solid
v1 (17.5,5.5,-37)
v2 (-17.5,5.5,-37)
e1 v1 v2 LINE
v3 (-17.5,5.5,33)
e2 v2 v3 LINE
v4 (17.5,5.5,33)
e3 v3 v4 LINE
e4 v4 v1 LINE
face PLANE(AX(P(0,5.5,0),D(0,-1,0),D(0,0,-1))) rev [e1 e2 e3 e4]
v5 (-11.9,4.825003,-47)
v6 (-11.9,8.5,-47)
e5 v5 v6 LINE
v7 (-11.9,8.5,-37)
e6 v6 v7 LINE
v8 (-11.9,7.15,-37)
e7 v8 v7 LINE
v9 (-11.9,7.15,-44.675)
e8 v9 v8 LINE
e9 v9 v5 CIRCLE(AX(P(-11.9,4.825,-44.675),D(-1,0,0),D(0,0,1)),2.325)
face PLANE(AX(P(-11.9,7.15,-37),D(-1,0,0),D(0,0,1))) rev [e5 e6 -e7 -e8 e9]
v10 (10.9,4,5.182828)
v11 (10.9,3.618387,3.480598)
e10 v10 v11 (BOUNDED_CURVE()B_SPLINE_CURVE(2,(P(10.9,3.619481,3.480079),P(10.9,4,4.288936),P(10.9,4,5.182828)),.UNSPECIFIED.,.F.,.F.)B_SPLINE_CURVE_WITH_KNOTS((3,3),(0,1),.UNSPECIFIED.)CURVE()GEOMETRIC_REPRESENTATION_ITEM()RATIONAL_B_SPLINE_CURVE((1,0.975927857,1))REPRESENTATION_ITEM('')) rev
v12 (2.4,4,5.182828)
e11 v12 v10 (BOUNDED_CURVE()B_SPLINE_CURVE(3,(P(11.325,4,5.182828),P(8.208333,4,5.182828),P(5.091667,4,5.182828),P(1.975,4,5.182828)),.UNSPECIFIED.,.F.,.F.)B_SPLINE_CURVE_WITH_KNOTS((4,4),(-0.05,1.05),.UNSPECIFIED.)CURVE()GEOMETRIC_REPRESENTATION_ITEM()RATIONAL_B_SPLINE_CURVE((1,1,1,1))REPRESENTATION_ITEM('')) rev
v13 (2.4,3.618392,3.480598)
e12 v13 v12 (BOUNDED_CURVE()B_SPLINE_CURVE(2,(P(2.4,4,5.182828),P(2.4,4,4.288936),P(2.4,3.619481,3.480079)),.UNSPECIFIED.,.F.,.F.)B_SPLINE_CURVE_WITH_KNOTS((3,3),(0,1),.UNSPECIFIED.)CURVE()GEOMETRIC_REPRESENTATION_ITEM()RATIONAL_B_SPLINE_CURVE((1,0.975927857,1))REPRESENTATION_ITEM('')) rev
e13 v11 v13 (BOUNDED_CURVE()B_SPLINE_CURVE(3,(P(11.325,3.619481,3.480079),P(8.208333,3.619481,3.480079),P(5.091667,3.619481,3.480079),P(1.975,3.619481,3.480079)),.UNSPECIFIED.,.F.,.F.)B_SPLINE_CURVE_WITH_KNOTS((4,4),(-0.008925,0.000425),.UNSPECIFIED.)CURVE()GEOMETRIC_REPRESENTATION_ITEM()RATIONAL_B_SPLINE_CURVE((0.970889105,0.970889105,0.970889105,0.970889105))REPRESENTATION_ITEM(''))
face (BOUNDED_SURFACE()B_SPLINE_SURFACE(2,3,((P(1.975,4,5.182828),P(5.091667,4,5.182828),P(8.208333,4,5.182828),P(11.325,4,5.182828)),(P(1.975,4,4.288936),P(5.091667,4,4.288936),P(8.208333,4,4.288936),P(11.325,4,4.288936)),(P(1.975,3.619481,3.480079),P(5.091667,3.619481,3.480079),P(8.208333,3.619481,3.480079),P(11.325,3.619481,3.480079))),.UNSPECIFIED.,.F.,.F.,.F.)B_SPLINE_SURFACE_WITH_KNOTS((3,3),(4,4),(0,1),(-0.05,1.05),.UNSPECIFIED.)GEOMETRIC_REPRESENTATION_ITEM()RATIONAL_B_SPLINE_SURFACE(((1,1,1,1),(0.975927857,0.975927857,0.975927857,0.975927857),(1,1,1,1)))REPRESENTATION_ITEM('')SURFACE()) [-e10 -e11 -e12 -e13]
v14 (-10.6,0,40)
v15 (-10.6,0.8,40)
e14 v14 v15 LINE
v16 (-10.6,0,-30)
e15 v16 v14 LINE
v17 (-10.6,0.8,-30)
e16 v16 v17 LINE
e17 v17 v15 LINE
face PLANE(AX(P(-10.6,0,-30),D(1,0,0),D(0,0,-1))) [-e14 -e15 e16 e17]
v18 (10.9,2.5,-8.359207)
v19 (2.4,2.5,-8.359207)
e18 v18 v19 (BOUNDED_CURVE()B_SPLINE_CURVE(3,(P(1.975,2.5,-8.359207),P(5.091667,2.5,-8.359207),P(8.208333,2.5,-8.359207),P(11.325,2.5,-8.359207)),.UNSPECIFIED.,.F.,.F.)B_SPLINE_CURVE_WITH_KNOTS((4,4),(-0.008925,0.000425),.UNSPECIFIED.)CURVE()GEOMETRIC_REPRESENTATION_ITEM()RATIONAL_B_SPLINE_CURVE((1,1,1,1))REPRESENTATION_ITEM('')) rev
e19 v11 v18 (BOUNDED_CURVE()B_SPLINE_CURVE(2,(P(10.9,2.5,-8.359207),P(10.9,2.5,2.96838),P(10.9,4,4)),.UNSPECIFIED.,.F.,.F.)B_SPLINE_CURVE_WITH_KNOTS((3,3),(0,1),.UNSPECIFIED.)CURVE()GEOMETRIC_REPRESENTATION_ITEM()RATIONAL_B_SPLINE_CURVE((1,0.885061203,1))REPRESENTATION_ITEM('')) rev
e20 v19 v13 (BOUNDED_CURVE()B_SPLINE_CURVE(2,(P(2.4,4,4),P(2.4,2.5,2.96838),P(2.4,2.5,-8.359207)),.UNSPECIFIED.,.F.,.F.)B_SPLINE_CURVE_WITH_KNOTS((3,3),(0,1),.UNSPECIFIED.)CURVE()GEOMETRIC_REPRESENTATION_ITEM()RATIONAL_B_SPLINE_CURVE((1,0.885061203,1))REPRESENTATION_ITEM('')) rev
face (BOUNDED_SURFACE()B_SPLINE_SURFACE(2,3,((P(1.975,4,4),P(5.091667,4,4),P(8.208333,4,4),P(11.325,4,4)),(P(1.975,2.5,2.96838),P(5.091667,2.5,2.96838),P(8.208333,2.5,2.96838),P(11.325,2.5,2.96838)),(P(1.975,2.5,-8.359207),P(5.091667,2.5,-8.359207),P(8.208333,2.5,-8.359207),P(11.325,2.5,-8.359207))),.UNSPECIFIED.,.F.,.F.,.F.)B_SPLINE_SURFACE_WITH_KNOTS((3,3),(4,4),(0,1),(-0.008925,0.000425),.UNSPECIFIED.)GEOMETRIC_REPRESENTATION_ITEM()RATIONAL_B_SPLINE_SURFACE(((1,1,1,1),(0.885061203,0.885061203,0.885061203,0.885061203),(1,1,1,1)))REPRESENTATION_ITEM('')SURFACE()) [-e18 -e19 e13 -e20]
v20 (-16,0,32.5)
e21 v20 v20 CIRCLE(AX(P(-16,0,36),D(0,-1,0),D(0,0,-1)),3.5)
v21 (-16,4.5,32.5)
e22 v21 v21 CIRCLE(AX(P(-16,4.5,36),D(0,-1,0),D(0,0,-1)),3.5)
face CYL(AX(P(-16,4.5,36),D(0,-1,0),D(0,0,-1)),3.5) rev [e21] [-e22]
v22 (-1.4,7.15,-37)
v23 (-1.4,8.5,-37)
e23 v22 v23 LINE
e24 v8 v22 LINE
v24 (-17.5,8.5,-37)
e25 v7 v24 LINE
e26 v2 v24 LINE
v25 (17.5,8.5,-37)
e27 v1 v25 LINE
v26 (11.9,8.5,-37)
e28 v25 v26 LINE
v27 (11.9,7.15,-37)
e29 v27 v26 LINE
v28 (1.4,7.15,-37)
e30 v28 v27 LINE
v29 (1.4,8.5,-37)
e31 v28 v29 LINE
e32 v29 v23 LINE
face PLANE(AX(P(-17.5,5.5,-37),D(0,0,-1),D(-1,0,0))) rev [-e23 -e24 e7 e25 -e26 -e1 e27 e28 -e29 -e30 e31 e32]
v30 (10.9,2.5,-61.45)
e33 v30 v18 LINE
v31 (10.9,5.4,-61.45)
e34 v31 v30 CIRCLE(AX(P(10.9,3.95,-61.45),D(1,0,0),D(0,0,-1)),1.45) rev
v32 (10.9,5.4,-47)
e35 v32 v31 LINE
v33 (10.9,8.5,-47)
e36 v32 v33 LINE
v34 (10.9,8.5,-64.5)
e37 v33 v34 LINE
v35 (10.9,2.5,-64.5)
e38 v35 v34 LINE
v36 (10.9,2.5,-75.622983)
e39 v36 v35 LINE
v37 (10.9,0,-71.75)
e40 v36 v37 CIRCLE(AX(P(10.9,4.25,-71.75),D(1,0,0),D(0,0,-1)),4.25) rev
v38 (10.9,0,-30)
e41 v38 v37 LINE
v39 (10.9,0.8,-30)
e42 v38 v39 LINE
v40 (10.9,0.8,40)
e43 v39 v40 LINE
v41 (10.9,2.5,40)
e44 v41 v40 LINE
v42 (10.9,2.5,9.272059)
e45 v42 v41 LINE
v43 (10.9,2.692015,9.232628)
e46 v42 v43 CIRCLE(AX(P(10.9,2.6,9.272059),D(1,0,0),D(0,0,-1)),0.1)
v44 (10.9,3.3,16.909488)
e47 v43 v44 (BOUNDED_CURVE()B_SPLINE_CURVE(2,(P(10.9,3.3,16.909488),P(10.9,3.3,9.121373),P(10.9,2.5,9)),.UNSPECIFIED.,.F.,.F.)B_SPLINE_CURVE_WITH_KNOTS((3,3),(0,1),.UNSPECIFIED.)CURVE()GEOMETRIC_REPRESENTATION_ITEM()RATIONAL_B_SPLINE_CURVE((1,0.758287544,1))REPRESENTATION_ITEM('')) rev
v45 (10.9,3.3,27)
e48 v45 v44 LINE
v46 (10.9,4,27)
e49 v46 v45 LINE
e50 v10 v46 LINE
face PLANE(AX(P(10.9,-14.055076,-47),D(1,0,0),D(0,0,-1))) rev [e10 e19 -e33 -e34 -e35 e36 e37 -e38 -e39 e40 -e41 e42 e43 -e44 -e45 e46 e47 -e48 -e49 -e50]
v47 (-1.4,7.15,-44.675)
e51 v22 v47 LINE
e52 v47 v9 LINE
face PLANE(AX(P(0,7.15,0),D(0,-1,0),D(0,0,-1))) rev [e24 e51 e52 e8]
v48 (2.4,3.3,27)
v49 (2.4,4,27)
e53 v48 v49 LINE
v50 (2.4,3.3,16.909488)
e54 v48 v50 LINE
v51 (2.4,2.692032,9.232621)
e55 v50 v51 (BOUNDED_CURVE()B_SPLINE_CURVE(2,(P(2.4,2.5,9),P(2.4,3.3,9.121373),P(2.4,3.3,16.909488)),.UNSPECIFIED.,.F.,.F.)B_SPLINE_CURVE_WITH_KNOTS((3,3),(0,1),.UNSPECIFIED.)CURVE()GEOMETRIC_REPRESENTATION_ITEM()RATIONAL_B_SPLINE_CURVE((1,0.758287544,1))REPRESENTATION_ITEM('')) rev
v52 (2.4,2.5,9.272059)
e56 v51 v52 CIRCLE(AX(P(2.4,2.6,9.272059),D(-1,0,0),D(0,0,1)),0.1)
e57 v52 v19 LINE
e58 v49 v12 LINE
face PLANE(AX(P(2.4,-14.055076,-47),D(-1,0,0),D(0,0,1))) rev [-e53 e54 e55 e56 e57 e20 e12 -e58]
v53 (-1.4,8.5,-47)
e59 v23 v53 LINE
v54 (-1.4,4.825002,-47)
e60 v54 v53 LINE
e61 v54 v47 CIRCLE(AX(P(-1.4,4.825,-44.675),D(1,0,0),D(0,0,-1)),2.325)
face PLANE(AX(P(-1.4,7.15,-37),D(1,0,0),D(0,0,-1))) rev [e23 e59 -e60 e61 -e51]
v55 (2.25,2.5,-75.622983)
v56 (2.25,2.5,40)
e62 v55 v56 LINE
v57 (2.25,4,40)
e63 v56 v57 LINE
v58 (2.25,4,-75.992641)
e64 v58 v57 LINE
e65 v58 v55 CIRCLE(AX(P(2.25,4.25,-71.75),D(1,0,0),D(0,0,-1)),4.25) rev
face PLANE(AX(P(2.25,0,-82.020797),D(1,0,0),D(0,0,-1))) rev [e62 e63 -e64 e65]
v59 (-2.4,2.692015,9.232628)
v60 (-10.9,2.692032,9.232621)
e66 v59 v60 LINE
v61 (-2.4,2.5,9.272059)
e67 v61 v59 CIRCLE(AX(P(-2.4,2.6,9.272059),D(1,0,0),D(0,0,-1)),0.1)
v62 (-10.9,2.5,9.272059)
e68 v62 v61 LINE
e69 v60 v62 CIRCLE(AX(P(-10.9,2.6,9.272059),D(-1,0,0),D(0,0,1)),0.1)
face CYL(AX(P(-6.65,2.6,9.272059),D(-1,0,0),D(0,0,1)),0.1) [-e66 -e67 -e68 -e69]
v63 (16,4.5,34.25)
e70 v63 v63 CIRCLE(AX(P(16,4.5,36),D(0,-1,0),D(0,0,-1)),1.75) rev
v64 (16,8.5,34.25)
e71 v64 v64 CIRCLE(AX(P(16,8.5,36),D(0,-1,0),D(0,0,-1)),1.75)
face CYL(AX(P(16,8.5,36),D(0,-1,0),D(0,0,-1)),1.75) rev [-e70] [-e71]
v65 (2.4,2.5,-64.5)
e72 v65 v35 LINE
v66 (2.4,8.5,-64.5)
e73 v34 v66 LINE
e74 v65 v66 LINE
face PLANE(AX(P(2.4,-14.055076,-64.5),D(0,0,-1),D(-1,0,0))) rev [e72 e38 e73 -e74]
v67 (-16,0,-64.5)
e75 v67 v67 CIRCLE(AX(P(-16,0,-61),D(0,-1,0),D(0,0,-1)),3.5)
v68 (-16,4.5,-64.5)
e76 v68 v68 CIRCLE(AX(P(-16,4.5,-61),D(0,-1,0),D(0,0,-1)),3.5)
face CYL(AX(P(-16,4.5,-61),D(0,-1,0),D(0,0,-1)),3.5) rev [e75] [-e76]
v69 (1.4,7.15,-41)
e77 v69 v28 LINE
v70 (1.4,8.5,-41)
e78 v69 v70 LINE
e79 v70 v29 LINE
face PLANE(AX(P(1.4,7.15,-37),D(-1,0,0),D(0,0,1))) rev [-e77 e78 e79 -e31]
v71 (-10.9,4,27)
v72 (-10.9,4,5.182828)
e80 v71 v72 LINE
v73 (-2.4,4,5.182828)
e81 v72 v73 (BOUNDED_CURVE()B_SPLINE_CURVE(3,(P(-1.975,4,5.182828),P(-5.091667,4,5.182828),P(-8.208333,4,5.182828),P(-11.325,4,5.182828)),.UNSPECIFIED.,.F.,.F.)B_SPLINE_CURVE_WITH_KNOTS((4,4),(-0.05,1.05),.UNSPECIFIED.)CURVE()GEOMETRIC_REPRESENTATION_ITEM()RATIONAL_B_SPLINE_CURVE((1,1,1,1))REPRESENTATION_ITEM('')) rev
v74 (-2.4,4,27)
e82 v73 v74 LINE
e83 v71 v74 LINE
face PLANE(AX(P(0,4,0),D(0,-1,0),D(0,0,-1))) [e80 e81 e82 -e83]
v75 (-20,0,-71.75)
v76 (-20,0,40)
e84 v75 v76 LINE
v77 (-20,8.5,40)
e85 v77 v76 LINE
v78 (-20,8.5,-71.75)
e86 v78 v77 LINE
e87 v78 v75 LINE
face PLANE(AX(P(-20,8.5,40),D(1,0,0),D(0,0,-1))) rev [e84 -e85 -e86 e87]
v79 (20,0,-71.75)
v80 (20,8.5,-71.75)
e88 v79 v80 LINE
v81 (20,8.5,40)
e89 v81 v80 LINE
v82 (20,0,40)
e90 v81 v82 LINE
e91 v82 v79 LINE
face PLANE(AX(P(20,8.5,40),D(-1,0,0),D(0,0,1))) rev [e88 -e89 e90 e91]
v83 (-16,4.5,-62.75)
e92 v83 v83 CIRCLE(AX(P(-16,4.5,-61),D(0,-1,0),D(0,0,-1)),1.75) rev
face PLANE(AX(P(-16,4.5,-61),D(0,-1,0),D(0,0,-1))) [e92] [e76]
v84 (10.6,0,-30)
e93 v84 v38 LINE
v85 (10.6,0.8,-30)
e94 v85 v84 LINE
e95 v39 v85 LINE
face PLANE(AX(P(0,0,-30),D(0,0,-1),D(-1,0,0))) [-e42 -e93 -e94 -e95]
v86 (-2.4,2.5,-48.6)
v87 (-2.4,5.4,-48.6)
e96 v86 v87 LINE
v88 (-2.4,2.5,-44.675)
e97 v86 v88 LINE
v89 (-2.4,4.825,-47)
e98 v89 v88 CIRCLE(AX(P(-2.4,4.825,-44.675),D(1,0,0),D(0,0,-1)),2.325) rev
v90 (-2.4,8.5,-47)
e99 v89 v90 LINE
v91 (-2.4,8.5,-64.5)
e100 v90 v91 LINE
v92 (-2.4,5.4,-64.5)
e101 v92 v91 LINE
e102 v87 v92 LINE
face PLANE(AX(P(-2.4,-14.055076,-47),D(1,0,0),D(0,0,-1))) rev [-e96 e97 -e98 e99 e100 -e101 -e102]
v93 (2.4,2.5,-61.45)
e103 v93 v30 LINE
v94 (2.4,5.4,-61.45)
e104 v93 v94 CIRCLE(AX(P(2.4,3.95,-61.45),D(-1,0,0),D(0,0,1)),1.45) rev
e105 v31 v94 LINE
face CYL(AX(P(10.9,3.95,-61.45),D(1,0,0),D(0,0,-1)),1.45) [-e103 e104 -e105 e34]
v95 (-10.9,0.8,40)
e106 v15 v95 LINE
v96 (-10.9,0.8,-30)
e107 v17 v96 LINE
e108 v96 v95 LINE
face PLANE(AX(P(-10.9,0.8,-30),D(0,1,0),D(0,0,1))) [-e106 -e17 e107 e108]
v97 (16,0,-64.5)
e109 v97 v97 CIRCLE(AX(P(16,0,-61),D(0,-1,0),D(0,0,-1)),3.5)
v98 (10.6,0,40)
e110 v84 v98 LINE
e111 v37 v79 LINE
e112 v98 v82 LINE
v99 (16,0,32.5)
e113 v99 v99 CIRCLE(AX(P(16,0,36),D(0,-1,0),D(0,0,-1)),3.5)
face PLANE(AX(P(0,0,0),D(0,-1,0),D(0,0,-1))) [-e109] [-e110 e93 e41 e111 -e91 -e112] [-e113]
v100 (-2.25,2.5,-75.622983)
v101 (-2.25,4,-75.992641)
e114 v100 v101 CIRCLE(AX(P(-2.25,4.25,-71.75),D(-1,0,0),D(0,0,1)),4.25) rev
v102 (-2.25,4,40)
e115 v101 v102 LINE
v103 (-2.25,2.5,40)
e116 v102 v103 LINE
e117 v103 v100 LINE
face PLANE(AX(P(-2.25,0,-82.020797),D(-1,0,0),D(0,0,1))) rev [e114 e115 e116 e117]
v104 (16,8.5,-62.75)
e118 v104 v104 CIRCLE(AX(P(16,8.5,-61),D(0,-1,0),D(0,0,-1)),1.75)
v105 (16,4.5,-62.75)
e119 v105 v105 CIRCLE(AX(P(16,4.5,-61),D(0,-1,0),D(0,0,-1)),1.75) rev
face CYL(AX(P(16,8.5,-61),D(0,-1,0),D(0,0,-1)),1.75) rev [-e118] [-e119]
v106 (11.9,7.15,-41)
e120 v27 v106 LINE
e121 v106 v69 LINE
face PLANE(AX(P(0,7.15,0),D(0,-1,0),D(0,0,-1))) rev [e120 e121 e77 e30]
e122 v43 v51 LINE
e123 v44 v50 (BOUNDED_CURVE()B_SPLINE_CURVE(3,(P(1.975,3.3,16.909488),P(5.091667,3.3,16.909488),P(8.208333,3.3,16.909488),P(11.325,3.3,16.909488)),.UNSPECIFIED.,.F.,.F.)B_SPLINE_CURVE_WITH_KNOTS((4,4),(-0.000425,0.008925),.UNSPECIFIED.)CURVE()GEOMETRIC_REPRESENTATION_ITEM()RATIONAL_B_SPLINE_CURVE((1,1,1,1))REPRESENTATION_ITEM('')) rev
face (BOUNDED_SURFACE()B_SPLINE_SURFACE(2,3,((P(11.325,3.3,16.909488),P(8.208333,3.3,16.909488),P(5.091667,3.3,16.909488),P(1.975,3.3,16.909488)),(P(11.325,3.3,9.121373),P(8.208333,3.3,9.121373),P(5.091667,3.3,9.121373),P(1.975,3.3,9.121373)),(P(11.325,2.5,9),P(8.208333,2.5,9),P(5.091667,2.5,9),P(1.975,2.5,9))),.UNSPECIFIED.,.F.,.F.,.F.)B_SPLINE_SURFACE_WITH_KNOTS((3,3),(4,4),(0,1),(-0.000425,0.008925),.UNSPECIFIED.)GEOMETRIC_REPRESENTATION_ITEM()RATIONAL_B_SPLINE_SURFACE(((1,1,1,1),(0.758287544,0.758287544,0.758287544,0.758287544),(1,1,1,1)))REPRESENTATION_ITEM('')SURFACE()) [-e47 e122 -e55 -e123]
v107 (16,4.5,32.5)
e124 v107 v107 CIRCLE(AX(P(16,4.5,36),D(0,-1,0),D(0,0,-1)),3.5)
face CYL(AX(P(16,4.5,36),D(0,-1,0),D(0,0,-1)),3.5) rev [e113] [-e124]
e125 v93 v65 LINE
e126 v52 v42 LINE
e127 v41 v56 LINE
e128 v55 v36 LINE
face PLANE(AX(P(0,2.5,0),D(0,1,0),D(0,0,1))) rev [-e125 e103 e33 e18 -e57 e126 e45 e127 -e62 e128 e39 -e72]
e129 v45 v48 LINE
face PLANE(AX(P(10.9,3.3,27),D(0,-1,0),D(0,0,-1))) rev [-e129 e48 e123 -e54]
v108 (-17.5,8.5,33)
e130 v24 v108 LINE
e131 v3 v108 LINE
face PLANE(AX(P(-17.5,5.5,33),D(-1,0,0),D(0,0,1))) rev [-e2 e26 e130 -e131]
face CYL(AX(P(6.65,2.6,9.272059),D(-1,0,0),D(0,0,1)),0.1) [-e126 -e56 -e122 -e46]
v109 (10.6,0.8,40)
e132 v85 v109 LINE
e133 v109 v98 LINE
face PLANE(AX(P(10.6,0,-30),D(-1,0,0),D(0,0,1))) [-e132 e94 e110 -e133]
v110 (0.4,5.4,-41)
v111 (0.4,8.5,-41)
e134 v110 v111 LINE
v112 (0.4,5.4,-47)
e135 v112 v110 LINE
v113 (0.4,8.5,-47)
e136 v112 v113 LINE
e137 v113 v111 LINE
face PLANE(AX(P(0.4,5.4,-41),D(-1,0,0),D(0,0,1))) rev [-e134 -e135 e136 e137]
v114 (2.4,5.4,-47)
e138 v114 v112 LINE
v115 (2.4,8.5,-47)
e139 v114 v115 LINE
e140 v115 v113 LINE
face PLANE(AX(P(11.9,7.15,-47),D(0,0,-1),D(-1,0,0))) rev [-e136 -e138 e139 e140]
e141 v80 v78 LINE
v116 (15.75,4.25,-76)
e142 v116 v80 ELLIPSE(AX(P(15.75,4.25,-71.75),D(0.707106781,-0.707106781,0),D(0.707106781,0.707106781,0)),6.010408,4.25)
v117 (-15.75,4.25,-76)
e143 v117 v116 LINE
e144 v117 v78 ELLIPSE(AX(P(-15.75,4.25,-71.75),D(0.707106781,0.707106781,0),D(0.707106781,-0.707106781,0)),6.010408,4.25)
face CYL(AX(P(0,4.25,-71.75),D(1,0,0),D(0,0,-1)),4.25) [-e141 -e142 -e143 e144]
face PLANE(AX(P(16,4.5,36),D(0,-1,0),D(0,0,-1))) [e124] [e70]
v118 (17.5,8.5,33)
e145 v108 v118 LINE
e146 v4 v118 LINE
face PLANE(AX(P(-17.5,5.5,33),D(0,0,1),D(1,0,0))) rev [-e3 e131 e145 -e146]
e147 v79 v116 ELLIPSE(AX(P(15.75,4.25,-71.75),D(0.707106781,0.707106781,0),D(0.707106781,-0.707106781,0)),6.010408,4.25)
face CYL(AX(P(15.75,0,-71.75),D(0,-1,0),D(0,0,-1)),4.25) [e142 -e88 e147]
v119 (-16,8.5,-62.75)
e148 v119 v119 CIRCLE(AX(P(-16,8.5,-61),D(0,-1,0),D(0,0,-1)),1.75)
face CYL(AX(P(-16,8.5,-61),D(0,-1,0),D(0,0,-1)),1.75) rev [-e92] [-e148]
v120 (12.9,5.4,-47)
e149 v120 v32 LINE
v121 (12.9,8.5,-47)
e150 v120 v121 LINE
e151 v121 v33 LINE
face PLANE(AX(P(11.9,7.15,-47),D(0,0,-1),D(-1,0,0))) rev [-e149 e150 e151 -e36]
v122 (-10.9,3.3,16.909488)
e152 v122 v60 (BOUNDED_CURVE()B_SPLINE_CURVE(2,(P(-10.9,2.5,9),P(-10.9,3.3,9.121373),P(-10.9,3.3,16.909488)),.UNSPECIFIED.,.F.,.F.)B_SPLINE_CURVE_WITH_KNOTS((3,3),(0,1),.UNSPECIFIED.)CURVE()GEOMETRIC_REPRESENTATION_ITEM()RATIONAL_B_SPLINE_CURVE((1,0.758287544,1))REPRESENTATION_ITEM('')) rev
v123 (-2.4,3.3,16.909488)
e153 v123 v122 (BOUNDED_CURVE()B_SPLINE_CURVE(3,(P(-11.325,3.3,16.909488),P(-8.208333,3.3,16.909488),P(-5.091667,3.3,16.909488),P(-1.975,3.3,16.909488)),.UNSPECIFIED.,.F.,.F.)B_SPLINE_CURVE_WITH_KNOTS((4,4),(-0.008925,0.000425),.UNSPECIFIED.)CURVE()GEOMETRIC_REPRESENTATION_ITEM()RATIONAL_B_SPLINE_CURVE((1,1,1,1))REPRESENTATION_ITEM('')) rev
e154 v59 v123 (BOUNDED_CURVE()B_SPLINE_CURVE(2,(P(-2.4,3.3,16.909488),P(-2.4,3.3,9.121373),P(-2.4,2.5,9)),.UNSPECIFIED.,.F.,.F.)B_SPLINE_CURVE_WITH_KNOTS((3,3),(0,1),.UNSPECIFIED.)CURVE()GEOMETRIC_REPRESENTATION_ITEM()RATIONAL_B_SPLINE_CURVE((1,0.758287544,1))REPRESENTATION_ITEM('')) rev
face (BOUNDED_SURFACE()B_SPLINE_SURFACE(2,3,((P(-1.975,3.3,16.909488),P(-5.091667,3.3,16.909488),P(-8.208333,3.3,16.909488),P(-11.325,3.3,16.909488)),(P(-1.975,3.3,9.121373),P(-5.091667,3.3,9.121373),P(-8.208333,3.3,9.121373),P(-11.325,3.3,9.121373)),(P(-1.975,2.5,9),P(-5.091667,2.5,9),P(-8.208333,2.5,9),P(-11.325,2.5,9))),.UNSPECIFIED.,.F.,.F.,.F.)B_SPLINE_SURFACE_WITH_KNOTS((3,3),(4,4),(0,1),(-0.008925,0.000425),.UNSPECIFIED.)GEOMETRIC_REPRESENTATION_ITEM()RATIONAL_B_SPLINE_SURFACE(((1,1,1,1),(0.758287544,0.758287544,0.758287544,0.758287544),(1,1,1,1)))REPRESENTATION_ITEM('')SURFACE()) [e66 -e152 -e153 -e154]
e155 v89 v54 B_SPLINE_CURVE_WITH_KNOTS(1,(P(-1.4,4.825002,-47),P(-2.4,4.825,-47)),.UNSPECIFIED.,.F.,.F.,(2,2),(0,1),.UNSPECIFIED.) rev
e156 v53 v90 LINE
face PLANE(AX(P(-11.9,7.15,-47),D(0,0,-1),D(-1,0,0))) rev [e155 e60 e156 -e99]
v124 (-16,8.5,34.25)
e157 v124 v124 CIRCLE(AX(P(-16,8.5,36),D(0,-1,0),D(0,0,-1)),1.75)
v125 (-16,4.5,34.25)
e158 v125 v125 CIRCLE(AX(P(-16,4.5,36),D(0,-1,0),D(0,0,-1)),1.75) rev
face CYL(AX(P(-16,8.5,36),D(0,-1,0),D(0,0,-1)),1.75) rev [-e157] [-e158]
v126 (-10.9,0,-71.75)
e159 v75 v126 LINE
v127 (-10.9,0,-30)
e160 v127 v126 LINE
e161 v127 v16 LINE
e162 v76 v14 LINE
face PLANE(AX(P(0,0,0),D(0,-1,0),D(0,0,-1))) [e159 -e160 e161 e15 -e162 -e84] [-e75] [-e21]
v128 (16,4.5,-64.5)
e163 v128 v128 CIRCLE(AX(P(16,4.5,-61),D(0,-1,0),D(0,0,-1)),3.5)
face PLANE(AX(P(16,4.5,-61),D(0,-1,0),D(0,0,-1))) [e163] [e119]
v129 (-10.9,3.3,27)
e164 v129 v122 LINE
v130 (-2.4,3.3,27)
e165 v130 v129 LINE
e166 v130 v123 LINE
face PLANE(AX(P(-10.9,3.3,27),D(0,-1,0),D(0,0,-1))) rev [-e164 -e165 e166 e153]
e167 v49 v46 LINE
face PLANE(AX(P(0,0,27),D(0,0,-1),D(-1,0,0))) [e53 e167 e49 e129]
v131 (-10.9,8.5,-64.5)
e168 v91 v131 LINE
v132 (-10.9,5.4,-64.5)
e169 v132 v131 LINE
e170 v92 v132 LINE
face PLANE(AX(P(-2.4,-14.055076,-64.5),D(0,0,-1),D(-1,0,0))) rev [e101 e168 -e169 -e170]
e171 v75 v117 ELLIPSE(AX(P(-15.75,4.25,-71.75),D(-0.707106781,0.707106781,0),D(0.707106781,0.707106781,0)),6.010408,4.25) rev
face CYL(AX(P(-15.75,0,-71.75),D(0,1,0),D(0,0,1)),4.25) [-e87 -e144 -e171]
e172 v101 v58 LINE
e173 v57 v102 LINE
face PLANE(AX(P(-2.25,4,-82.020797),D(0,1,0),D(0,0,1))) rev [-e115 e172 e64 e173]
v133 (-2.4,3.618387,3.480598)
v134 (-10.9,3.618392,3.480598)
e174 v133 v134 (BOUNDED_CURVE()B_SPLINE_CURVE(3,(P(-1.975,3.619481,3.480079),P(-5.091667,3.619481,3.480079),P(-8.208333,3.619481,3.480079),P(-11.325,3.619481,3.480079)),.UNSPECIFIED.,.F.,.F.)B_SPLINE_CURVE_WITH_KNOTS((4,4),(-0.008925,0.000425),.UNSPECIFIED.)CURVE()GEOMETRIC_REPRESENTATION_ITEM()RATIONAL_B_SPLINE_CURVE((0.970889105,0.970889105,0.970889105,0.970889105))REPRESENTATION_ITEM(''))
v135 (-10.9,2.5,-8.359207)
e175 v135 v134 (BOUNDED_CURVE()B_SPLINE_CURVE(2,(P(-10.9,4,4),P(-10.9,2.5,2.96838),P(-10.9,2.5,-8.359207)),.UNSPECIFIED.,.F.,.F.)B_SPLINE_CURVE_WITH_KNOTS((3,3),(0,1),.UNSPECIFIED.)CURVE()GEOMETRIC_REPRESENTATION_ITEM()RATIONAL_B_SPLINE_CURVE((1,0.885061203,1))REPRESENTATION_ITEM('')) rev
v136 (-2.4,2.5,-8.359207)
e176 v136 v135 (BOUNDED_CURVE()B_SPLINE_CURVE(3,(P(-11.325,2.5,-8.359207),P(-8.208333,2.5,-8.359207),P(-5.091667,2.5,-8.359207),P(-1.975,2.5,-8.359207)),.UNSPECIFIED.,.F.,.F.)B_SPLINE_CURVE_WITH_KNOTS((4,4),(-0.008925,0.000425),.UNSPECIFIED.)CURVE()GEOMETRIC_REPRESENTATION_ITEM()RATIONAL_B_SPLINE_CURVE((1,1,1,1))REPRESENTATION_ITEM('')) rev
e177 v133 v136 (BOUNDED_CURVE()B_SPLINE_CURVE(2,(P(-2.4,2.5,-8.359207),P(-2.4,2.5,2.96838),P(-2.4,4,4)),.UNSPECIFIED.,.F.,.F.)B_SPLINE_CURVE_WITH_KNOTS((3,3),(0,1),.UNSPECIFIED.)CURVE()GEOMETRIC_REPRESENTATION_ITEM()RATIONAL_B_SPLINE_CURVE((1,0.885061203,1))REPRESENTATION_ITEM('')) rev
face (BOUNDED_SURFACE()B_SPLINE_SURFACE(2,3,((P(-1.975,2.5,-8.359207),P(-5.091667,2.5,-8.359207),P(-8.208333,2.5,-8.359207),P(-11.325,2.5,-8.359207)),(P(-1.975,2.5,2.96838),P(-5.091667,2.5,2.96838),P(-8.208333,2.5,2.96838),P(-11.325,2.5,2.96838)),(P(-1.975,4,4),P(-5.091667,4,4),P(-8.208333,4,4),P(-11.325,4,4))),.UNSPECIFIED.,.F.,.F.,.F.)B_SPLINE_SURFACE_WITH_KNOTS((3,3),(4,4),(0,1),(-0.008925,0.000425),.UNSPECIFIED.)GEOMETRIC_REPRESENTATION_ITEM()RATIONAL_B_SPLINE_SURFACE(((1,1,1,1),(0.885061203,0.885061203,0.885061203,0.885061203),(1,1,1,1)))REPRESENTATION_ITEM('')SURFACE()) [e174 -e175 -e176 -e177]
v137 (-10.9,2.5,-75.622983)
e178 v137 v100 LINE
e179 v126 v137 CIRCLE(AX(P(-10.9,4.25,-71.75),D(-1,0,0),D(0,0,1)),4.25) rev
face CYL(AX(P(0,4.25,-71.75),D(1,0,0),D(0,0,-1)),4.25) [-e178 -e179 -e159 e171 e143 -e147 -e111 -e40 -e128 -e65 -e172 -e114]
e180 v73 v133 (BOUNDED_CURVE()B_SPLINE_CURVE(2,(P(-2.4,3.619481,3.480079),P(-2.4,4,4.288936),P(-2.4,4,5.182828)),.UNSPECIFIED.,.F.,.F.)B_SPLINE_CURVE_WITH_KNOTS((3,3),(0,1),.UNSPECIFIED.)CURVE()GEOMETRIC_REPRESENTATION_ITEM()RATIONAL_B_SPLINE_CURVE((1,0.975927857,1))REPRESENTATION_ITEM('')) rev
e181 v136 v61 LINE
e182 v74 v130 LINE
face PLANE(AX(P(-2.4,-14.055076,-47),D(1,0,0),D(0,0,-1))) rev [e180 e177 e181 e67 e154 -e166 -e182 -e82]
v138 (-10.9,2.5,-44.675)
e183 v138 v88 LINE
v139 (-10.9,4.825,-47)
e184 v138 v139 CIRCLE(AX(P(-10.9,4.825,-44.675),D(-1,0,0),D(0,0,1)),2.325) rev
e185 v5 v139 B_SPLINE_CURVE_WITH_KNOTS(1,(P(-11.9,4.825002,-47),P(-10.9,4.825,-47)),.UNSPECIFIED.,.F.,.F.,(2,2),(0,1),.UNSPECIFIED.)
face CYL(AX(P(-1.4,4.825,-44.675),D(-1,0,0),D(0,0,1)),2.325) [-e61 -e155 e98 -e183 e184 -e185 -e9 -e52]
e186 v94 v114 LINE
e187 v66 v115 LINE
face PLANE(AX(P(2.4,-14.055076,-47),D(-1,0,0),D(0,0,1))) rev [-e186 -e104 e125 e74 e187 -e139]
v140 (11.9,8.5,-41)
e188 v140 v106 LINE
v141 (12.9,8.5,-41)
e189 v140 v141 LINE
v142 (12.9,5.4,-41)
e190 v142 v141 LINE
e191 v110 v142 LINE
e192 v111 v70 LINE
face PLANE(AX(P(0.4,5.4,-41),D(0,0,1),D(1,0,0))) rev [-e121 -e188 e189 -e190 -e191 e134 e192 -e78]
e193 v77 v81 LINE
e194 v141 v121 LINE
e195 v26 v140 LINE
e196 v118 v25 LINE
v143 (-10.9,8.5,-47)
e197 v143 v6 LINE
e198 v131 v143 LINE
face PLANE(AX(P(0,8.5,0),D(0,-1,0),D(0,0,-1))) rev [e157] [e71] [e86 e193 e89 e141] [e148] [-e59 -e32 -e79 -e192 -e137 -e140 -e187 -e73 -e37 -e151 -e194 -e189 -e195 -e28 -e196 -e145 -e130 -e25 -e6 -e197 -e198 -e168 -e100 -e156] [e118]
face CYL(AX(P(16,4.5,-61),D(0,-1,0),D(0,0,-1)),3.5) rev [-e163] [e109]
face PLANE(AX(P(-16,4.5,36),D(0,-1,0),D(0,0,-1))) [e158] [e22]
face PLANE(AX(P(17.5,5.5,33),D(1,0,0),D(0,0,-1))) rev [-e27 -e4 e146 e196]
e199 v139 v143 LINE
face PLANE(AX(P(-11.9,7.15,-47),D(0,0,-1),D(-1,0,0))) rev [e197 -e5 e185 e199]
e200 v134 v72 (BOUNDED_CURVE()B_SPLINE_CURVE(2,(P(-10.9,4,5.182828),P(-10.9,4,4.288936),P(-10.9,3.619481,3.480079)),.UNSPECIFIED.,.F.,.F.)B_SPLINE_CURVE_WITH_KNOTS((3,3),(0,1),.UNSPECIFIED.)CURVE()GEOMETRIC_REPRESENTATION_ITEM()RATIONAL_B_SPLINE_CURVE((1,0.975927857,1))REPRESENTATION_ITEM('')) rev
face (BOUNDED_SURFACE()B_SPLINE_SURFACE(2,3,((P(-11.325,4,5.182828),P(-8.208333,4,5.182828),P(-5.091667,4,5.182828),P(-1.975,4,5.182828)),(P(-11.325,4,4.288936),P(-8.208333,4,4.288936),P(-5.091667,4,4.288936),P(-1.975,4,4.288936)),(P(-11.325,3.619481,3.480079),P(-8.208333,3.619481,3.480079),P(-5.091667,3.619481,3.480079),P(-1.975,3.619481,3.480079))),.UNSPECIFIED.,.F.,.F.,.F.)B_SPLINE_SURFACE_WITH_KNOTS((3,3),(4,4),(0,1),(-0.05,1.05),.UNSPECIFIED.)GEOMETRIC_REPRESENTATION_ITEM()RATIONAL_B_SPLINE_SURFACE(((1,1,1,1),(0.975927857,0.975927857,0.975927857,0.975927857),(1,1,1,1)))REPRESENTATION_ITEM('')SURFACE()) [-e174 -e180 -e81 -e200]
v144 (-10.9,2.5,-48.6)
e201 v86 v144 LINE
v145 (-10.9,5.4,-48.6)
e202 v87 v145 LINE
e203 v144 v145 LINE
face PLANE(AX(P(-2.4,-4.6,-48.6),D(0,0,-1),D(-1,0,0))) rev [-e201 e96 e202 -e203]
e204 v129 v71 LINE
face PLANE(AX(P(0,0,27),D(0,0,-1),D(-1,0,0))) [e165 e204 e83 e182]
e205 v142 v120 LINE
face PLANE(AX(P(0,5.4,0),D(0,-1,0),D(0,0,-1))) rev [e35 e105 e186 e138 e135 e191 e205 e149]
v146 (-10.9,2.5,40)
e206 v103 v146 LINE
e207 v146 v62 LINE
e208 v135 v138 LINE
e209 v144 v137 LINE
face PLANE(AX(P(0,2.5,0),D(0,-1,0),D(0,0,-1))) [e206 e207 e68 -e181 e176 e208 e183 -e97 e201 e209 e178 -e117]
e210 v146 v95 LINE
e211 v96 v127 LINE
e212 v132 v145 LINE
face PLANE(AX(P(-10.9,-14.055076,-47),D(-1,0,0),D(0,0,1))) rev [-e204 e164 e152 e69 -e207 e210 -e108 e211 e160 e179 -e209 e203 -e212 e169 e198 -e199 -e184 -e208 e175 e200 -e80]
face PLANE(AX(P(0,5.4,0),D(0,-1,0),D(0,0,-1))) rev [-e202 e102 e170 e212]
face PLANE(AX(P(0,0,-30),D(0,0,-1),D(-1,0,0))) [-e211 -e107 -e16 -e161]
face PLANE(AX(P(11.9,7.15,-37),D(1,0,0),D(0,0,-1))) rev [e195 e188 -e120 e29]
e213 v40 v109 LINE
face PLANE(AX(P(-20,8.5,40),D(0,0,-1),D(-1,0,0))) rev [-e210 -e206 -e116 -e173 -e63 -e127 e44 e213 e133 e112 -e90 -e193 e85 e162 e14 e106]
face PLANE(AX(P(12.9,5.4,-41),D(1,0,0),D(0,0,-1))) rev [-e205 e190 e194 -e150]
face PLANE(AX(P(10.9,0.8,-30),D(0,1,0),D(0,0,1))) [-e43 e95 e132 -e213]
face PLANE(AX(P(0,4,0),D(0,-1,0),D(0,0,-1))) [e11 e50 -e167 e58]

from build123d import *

# Parameters (mm, degrees)
SKETCH1_W                  = 40
SKETCH1_H                  = 106
BOSS_EXTRUDE1_DEPTH        = 8.5
SKETCH2_W                  = 35
SKETCH2_H                  = 70
CUT_EXTRUDE1_DEPTH         = 3
SKETCH3_W                  = 10.5
SKETCH3_H                  = 10
CUT_EXTRUDE2_DEPTH         = 1.35
SKETCH4_W                  = 12.5
SKETCH4_H                  = 6
CUT_EXTRUDE3_DEPTH         = 3.1
SKETCH5_W                  = 8.5
SKETCH5_H                  = 17.5
PCB_PLACE_DEPTH            = 3.1
SKETCH6_W                  = 8.5
SKETCH6_H                  = 1.6
NICKEL_STRIP_HOLE_DEPTH    = 70.174850921
CUT_EXTRUDE4_REACH         = 71.486
SKETCH7_W                  = 8.5
SKETCH7_H                  = 17.5
SKETCH8_W                  = 8.5
SKETCH8_H                  = 1.6
CUT_EXTRUDE5_DEPTH         = 10
SKETCH9_W                  = 8.5
SKETCH9_H                  = 106
NICKEL_STRIP_RAIL_DEPTH    = 2.5
FILLET3_R                  = 2.325
FILLET4_RADIUS             = 1.45
FILLET4_LENGTH             = 8.5
SKETCH10_W                 = 8.5
SKETCH10_H                 = 5
CUT_EXTRUDE6_DEPTH         = 1.5
SKETCH11_W                 = 8.5
SKETCH11_H                 = 0.7
NICKELSTRIPINSERTION_DEPTH = 18
FILLET5_INSERTION_START    = -10.9
FILLET5_INSERTION_DEPTH    = 8.5
FILLET5_INSERTION_START_2  = 2.4
FILLET5_INSERTION_2_DEPTH  = 8.5
FILLET7_AMEND_R            = 4
FILLET6_START              = -10.9
FILLET6_DEPTH              = 8.5
FILLET6_START_2            = 2.4
FILLET6_2_DEPTH            = 8.5
FILLET8_ROUNDING_R         = 0.1
SKETCH12_W                 = 0.3
SKETCH12_H                 = 0.8
STRIPRAIL_DEPTH            = 70
SKETCH13_R                 = 1.75
SCREW_HOLES_DEPTH          = 70.485610128
SKETCH14_R                 = 3.5
SCREW_HEAD_HOLES_TBM_DEPTH = 4.5
BOSS_EXTRUDE2_DEPTH        = 10
FILLET9_R                  = 4.25
CUT_EXTRUDE7_REACH         = 120.018
SKETCH17_W                 = 4.5
SKETCH17_H                 = 4
CUT_EXTRUDE8_REACH         = 120.018
SKETCH18_W                 = 5.4
SKETCH18_H                 = 2.5


with BuildPart() as part:
    # Sketch1 → Boss-Extrude1 (new body)
    with BuildSketch(Plane(origin=(0, 0, 0), x_dir=(1, 0, 0), z_dir=(0, 1, 0))):
        with Locations((0, 13)):
            Rectangle(SKETCH1_W, SKETCH1_H)
    extrude(amount=BOSS_EXTRUDE1_DEPTH)

    # Sketch2 → Cut-Extrude1 (cut)
    with BuildSketch(Plane(origin=(0, 8.5, 0), x_dir=(1, 0, 0), z_dir=(0, 1, 0))):
        with Locations((0, 2)):
            Rectangle(SKETCH2_W, SKETCH2_H)
    extrude(amount=-CUT_EXTRUDE1_DEPTH, mode=Mode.SUBTRACT)

    # Sketch3 → Cut-Extrude2 (cut)
    with BuildSketch(Plane(origin=(0, 8.5, 0), x_dir=(1, 0, 0), z_dir=(0, 1, 0))):
        with Locations((-6.65, 42)):
            Rectangle(SKETCH3_W, SKETCH3_H)
        with Locations((6.65, 42)):
            Rectangle(SKETCH3_W, SKETCH3_H)
    extrude(amount=-CUT_EXTRUDE2_DEPTH, mode=Mode.SUBTRACT)

    # Sketch4 → Cut-Extrude3 (cut)
    with BuildSketch(Plane(origin=(0, 8.5, 0), x_dir=(1, 0, 0), z_dir=(0, 1, 0))):
        with Locations((6.65, 44)):
            Rectangle(SKETCH4_W, SKETCH4_H)
    extrude(amount=-CUT_EXTRUDE3_DEPTH, mode=Mode.SUBTRACT)

    # Sketch5 → PCB place (cut)
    with BuildSketch(Plane(origin=(0, 8.5, 0), x_dir=(1, 0, 0), z_dir=(0, 1, 0))):
        with Locations((6.65, 55.75)):
            Rectangle(SKETCH5_W, SKETCH5_H)
    extrude(amount=-PCB_PLACE_DEPTH, mode=Mode.SUBTRACT)

    # Sketch6 → Nickel strip hole (cut, through all)
    with BuildSketch(Plane(origin=(0, 5.4, 0), x_dir=(1, 0, 0), z_dir=(0, 1, 0))):
        with Locations((6.65, 63.7)):
            Rectangle(SKETCH6_W, SKETCH6_H)
    extrude(amount=-NICKEL_STRIP_HOLE_DEPTH, mode=Mode.SUBTRACT)

    # Cut-Extrude4: up to this face of the body (flat: up to its plane)
    cut_extrude4_end = Plane(part.part.faces().sort_by_distance((6.65, 5.4, -51.042077088))[0])
    # Sketch7 → Cut-Extrude4 (cut, up to the picked face)
    with BuildSketch(Plane(origin=(0, 8.5, 0), x_dir=(1, 0, 0), z_dir=(0, 1, 0)), mode=Mode.PRIVATE) as cut_extrude4_sk1:
        with Locations((-6.65, 55.75)):
            Rectangle(SKETCH7_W, SKETCH7_H)
    cut_extrude4_tool1 = split(extrude(cut_extrude4_sk1.sketch, amount=-CUT_EXTRUDE4_REACH, mode=Mode.PRIVATE), bisect_by=cut_extrude4_end, keep=Keep.BOTH, mode=Mode.PRIVATE)
    add(cut_extrude4_tool1.solids().sort_by(Axis((-6.65, 8.5, -55.75), (0, -1, 0)))[0], mode=Mode.SUBTRACT)

    # Sketch8 → Cut-Extrude5 (cut)
    with BuildSketch(Plane(origin=(0, 5.4, 0), x_dir=(1, 0, 0), z_dir=(0, 1, 0))):
        with Locations((-6.65, 47.8)):
            Rectangle(SKETCH8_W, SKETCH8_H)
    extrude(amount=-CUT_EXTRUDE5_DEPTH, mode=Mode.SUBTRACT)

    # Sketch9 → Nickel strip rail (cut)
    with BuildSketch(Plane.XZ):
        with Locations((-6.65, -13)):
            Rectangle(SKETCH9_W, SKETCH9_H)
        with Locations((6.65, -13)):
            Rectangle(SKETCH9_W, SKETCH9_H)
    extrude(amount=-NICKEL_STRIP_RAIL_DEPTH, mode=Mode.SUBTRACT)

    # Fillet3
    # the kernel refuses this fillet: 2.325 mm, written as the material it takes off along each edge
    with BuildSketch(Plane(origin=(3.4125, 7.15, -47), x_dir=(0, 0, 1), z_dir=(-1, 0, 0))) as fillet3_piece_1_section:
        with BuildLine():
            CenterArc((FILLET3_R, -FILLET3_R), FILLET3_R, 90, 90)
            Line((0, -FILLET3_R), (0, 0))
            Line((0, 0), (FILLET3_R, 0))
        make_face()
    fillet3_piece_1 = extrude(amount=20.125, mode=Mode.PRIVATE)
    fillet3_piece_1 = split(fillet3_piece_1, bisect_by=Plane(origin=(-11.9, 7.15, -47), z_dir=(1, 0, 0)), keep=Keep.TOP, mode=Mode.PRIVATE)
    fillet3_piece_1 = split(fillet3_piece_1, bisect_by=Plane(origin=(-1.4, 7.15, -47), z_dir=(-1, 0, 0)), keep=Keep.TOP, mode=Mode.PRIVATE)
    add(fillet3_piece_1, mode=Mode.SUBTRACT)
    with BuildSketch(Plane(origin=(-10.9, 2.5, -47), x_dir=(0, 1, 0), z_dir=(1, 0, 0))) as fillet3_piece_2:
        with BuildLine():
            CenterArc((FILLET3_R, FILLET3_R), FILLET3_R, 180, 90)
            Line((0, FILLET3_R), (0, 0))
            Line((0, 0), (FILLET3_R, 0))
        make_face()
    extrude(amount=8.5, mode=Mode.SUBTRACT)

    # Fillet4: full round fillet: the end face becomes a half cylinder, R = half its width
    fillet4_face = Plane((6.65, 3.95, -62.9), x_dir=(1, 0, 0), z_dir=(0, 0, -1))  # on the end face: x along it, z out of the body
    fillet4_slab = fillet4_face.offset(-FILLET4_RADIUS / 2) * Box(FILLET4_LENGTH, 2 * FILLET4_RADIUS, FILLET4_RADIUS, mode=Mode.PRIVATE)  # the body's end, R deep
    fillet4_round = Plane((6.65, 3.95, -61.45), x_dir=(0, 0, -1), z_dir=(1, 0, 0)) * Cylinder(FILLET4_RADIUS, FILLET4_LENGTH, mode=Mode.PRIVATE)  # its axis R under the face
    add(fillet4_slab - fillet4_round, mode=Mode.SUBTRACT)

    # Sketch10 → Cut-Extrude6 (cut)
    with BuildSketch(Plane.XZ.offset(-2.5)):
        with Locations((6.65, 6.5)):
            Rectangle(SKETCH10_W, SKETCH10_H)
        with Locations((-6.65, 6.5)):
            Rectangle(SKETCH10_W, SKETCH10_H)
    extrude(amount=-CUT_EXTRUDE6_DEPTH, mode=Mode.SUBTRACT)

    # Sketch11 → NickelStripInsertion (cut)
    with BuildSketch(Plane(origin=(0, 0, 9), x_dir=(-1, 0, 0), z_dir=(0, 0, -1))):
        with Locations((-6.65, 3.65)):
            Rectangle(SKETCH11_W, SKETCH11_H)
        with Locations((6.65, 3.65)):
            Rectangle(SKETCH11_W, SKETCH11_H)
    extrude(amount=-NICKELSTRIPINSERTION_DEPTH, mode=Mode.SUBTRACT)

    # Fillet5_insertion: read off the stored shape, not the designer's step
    # Fillet5_insertion outline → Fillet5_insertion (cut)
    with BuildSketch(Plane.YZ.offset(FILLET5_INSERTION_START)):
        with BuildLine():
            Line((2.5, 4), (2.5, -8.359207094))
            add(Edge.make_bspline(
                [(2.5, -8.359207094), (2.5, 2.968380423), (4, 4)],
                knots=[0, 0, 0, 1, 1, 1], degree=2, weights=[1, 0.885061203, 1]))
            Line((4, 4), (2.5, 4))
        make_face()
    extrude(amount=FILLET5_INSERTION_DEPTH, mode=Mode.SUBTRACT)

    # Fillet5_insertion 2 outline → Fillet5_insertion 2 (cut)
    with BuildSketch(Plane.YZ.offset(FILLET5_INSERTION_START_2)):
        with BuildLine():
            Line((2.5, 4), (2.5, -8.359207094))
            add(Edge.make_bspline(
                [(2.5, -8.359207094), (2.5, 2.968380423), (4, 4)],
                knots=[0, 0, 0, 1, 1, 1], degree=2, weights=[1, 0.885061203, 1]))
            Line((4, 4), (2.5, 4))
        make_face()
    extrude(amount=FILLET5_INSERTION_2_DEPTH, mode=Mode.SUBTRACT)

    # Fillet7_amend
    fillet7_amend_edges = [part.edges().sort_by_distance(p)[0] for p in [
        (6.65, 4, 4),
        (-6.65, 4, 4),
    ]]
    fillet(fillet7_amend_edges, radius=FILLET7_AMEND_R)

    # Fillet6: read off the stored shape, not the designer's step
    # Fillet6 outline → Fillet6 (cut)
    with BuildSketch(Plane.YZ.offset(FILLET6_START)):
        with BuildLine():
            Line((3.3, 9), (3.3, 16.909487973))
            add(Edge.make_bspline(
                [(3.3, 16.909487973), (3.3, 9.121373217), (2.5, 9)],
                knots=[0, 0, 0, 1, 1, 1], degree=2, weights=[1, 0.758287544, 1]))
            Line((2.5, 9), (3.3, 9))
        make_face()
    extrude(amount=FILLET6_DEPTH, mode=Mode.SUBTRACT)

    # Fillet6 2 outline → Fillet6 2 (cut)
    with BuildSketch(Plane.YZ.offset(FILLET6_START_2)):
        with BuildLine():
            Line((3.3, 9), (3.3, 16.909487973))
            add(Edge.make_bspline(
                [(3.3, 16.909487973), (3.3, 9.121373217), (2.5, 9)],
                knots=[0, 0, 0, 1, 1, 1], degree=2, weights=[1, 0.758287544, 1]))
            Line((2.5, 9), (3.3, 9))
        make_face()
    extrude(amount=FILLET6_2_DEPTH, mode=Mode.SUBTRACT)

    # Fillet8_rounding
    fillet8_rounding_edges = [part.edges().sort_by_distance(p)[0] for p in [
        (-6.65, 2.5, 9),
        (6.65, 2.5, 9),
    ]]
    fillet(fillet8_rounding_edges, radius=FILLET8_ROUNDING_R)

    # Sketch12 → StripRail (add)
    with BuildSketch(Plane.XY.offset(40)):
        with Locations((2.55, 0.4)):
            Rectangle(SKETCH12_W, SKETCH12_H)
        with Locations((-10.75, 0.4)):
            Rectangle(SKETCH12_W, SKETCH12_H)
        with Locations((-2.55, 0.4)):
            Rectangle(SKETCH12_W, SKETCH12_H)
        with Locations((10.75, 0.4)):
            Rectangle(SKETCH12_W, SKETCH12_H)
    extrude(amount=-STRIPRAIL_DEPTH)

    # Sketch13 → Screw_Holes (cut, through all)
    with BuildSketch(Plane.XZ):
        with Locations(Location((-16, -61, 0), (0, 0, 270))):
            Circle(SKETCH13_R)
        with Locations(Location((16, -61, 0), (0, 0, 270))):
            Circle(SKETCH13_R)
        with Locations(Location((-16, 36, 0), (0, 0, 270))):
            Circle(SKETCH13_R)
        with Locations(Location((16, 36, 0), (0, 0, 270))):
            Circle(SKETCH13_R)
    extrude(amount=-SCREW_HOLES_DEPTH, mode=Mode.SUBTRACT)

    # Sketch14 → Screw_Head_Holes_TBM (cut)
    with BuildSketch(Plane.XZ):
        with Locations(Location((16, -61, 0), (0, 0, 270))):
            Circle(SKETCH14_R)
        with Locations(Location((-16, -61, 0), (0, 0, 270))):
            Circle(SKETCH14_R)
        with Locations(Location((16, 36, 0), (0, 0, 270))):
            Circle(SKETCH14_R)
        with Locations(Location((-16, 36, 0), (0, 0, 270))):
            Circle(SKETCH14_R)
    extrude(amount=-SCREW_HEAD_HOLES_TBM_DEPTH, mode=Mode.SUBTRACT)

    # Sketch15 → Boss-Extrude2 (add)
    with BuildSketch(Plane(origin=(0, 0, -66), x_dir=(-1, 0, 0), z_dir=(0, 0, -1))):
        Polygon((-20, 0), (-20, 8.5), (20, 8.5), (20, 0), (10.9, 0), (10.9, 2.5), (2.4, 2.5), (2.4, 0), (-2.4, 0), (-2.4, 2.5), (-10.9, 2.5), (-10.9, 0), align=None)
    extrude(amount=BOSS_EXTRUDE2_DEPTH)

    # Fillet9
    # the kernel refuses this fillet: 4.25 mm, written as the material it takes off along each edge
    with BuildSketch(Plane(origin=(0.275, 0, -76), x_dir=(0, 0, 1), z_dir=(1, 0, 0))) as fillet9_piece_1:
        with BuildLine():
            CenterArc((FILLET9_R, -FILLET9_R), FILLET9_R, 90, 90)
            Line((0, -FILLET9_R), (0, 0))
            Line((0, 0), (FILLET9_R, 0))
        make_face()
    extrude(amount=30.35, mode=Mode.SUBTRACT)
    with BuildSketch(Plane(origin=(-13.025, 0, -76), x_dir=(0, 0, 1), z_dir=(1, 0, 0))) as fillet9_piece_2:
        with BuildLine():
            CenterArc((FILLET9_R, -FILLET9_R), FILLET9_R, 90, 90)
            Line((0, -FILLET9_R), (0, 0))
            Line((0, 0), (FILLET9_R, 0))
        make_face()
    extrude(amount=26.05, mode=Mode.SUBTRACT)
    with BuildSketch(Plane(origin=(-30.625, 0, -76), x_dir=(0, 1, 0), z_dir=(1, 0, 0))) as fillet9_piece_3:
        with BuildLine():
            CenterArc((FILLET9_R, FILLET9_R), FILLET9_R, 180, 90)
            Line((0, FILLET9_R), (0, 0))
            Line((0, 0), (FILLET9_R, 0))
        make_face()
    extrude(amount=30.35, mode=Mode.SUBTRACT)
    with BuildSketch(Plane(origin=(-20, 19.125, -76), x_dir=(0, 0, 1), z_dir=(0, -1, 0)), Plane(origin=(20, -10.625, -76), x_dir=(0, 0, 1), z_dir=(0, 1, 0))) as fillet9_piece_4:
        with BuildLine():
            CenterArc((FILLET9_R, -FILLET9_R), FILLET9_R, 90, 90)
            Line((0, -FILLET9_R), (0, 0))
            Line((0, 0), (FILLET9_R, 0))
        make_face()
    extrude(amount=29.75, mode=Mode.SUBTRACT)
    with BuildSketch(Plane(origin=(30.625, 8.5, -76), x_dir=(0, 0, 1), z_dir=(-1, 0, 0))) as fillet9_piece_5:
        with BuildLine():
            CenterArc((FILLET9_R, -FILLET9_R), FILLET9_R, 90, 90)
            Line((0, -FILLET9_R), (0, 0))
            Line((0, 0), (FILLET9_R, 0))
        make_face()
    extrude(amount=61.25, mode=Mode.SUBTRACT)

    # Sketch17 → Cut-Extrude7 (cut, up to next)
    with BuildSketch(Plane.XY.offset(40), mode=Mode.PRIVATE) as cut_extrude7_sk1:
        with Locations((0, 2)):
            Rectangle(SKETCH17_W, SKETCH17_H)
    cut_extrude7_tool1 = extrude(cut_extrude7_sk1.sketch, amount=-CUT_EXTRUDE7_REACH, mode=Mode.PRIVATE) & part.part
    add(cut_extrude7_tool1.solids().sort_by_distance((0, 2, 40))[0], mode=Mode.SUBTRACT)

    # Sketch18 → Cut-Extrude8 (cut, up to next)
    with BuildSketch(Plane.XY.offset(40), mode=Mode.PRIVATE) as cut_extrude8_sk1:
        with Locations((0, 1.25)):
            Rectangle(SKETCH18_W, SKETCH18_H)
    cut_extrude8_tool1 = extrude(cut_extrude8_sk1.sketch, amount=-CUT_EXTRUDE8_REACH, mode=Mode.PRIVATE) & part.part
    add(cut_extrude8_tool1.solids().sort_by_distance((0, 1.25, 40))[0], mode=Mode.SUBTRACT)
    add(cut_extrude8_tool1.solids().sort_by_distance((0, 1.25, 40))[1], mode=Mode.SUBTRACT)


solid = part.part
